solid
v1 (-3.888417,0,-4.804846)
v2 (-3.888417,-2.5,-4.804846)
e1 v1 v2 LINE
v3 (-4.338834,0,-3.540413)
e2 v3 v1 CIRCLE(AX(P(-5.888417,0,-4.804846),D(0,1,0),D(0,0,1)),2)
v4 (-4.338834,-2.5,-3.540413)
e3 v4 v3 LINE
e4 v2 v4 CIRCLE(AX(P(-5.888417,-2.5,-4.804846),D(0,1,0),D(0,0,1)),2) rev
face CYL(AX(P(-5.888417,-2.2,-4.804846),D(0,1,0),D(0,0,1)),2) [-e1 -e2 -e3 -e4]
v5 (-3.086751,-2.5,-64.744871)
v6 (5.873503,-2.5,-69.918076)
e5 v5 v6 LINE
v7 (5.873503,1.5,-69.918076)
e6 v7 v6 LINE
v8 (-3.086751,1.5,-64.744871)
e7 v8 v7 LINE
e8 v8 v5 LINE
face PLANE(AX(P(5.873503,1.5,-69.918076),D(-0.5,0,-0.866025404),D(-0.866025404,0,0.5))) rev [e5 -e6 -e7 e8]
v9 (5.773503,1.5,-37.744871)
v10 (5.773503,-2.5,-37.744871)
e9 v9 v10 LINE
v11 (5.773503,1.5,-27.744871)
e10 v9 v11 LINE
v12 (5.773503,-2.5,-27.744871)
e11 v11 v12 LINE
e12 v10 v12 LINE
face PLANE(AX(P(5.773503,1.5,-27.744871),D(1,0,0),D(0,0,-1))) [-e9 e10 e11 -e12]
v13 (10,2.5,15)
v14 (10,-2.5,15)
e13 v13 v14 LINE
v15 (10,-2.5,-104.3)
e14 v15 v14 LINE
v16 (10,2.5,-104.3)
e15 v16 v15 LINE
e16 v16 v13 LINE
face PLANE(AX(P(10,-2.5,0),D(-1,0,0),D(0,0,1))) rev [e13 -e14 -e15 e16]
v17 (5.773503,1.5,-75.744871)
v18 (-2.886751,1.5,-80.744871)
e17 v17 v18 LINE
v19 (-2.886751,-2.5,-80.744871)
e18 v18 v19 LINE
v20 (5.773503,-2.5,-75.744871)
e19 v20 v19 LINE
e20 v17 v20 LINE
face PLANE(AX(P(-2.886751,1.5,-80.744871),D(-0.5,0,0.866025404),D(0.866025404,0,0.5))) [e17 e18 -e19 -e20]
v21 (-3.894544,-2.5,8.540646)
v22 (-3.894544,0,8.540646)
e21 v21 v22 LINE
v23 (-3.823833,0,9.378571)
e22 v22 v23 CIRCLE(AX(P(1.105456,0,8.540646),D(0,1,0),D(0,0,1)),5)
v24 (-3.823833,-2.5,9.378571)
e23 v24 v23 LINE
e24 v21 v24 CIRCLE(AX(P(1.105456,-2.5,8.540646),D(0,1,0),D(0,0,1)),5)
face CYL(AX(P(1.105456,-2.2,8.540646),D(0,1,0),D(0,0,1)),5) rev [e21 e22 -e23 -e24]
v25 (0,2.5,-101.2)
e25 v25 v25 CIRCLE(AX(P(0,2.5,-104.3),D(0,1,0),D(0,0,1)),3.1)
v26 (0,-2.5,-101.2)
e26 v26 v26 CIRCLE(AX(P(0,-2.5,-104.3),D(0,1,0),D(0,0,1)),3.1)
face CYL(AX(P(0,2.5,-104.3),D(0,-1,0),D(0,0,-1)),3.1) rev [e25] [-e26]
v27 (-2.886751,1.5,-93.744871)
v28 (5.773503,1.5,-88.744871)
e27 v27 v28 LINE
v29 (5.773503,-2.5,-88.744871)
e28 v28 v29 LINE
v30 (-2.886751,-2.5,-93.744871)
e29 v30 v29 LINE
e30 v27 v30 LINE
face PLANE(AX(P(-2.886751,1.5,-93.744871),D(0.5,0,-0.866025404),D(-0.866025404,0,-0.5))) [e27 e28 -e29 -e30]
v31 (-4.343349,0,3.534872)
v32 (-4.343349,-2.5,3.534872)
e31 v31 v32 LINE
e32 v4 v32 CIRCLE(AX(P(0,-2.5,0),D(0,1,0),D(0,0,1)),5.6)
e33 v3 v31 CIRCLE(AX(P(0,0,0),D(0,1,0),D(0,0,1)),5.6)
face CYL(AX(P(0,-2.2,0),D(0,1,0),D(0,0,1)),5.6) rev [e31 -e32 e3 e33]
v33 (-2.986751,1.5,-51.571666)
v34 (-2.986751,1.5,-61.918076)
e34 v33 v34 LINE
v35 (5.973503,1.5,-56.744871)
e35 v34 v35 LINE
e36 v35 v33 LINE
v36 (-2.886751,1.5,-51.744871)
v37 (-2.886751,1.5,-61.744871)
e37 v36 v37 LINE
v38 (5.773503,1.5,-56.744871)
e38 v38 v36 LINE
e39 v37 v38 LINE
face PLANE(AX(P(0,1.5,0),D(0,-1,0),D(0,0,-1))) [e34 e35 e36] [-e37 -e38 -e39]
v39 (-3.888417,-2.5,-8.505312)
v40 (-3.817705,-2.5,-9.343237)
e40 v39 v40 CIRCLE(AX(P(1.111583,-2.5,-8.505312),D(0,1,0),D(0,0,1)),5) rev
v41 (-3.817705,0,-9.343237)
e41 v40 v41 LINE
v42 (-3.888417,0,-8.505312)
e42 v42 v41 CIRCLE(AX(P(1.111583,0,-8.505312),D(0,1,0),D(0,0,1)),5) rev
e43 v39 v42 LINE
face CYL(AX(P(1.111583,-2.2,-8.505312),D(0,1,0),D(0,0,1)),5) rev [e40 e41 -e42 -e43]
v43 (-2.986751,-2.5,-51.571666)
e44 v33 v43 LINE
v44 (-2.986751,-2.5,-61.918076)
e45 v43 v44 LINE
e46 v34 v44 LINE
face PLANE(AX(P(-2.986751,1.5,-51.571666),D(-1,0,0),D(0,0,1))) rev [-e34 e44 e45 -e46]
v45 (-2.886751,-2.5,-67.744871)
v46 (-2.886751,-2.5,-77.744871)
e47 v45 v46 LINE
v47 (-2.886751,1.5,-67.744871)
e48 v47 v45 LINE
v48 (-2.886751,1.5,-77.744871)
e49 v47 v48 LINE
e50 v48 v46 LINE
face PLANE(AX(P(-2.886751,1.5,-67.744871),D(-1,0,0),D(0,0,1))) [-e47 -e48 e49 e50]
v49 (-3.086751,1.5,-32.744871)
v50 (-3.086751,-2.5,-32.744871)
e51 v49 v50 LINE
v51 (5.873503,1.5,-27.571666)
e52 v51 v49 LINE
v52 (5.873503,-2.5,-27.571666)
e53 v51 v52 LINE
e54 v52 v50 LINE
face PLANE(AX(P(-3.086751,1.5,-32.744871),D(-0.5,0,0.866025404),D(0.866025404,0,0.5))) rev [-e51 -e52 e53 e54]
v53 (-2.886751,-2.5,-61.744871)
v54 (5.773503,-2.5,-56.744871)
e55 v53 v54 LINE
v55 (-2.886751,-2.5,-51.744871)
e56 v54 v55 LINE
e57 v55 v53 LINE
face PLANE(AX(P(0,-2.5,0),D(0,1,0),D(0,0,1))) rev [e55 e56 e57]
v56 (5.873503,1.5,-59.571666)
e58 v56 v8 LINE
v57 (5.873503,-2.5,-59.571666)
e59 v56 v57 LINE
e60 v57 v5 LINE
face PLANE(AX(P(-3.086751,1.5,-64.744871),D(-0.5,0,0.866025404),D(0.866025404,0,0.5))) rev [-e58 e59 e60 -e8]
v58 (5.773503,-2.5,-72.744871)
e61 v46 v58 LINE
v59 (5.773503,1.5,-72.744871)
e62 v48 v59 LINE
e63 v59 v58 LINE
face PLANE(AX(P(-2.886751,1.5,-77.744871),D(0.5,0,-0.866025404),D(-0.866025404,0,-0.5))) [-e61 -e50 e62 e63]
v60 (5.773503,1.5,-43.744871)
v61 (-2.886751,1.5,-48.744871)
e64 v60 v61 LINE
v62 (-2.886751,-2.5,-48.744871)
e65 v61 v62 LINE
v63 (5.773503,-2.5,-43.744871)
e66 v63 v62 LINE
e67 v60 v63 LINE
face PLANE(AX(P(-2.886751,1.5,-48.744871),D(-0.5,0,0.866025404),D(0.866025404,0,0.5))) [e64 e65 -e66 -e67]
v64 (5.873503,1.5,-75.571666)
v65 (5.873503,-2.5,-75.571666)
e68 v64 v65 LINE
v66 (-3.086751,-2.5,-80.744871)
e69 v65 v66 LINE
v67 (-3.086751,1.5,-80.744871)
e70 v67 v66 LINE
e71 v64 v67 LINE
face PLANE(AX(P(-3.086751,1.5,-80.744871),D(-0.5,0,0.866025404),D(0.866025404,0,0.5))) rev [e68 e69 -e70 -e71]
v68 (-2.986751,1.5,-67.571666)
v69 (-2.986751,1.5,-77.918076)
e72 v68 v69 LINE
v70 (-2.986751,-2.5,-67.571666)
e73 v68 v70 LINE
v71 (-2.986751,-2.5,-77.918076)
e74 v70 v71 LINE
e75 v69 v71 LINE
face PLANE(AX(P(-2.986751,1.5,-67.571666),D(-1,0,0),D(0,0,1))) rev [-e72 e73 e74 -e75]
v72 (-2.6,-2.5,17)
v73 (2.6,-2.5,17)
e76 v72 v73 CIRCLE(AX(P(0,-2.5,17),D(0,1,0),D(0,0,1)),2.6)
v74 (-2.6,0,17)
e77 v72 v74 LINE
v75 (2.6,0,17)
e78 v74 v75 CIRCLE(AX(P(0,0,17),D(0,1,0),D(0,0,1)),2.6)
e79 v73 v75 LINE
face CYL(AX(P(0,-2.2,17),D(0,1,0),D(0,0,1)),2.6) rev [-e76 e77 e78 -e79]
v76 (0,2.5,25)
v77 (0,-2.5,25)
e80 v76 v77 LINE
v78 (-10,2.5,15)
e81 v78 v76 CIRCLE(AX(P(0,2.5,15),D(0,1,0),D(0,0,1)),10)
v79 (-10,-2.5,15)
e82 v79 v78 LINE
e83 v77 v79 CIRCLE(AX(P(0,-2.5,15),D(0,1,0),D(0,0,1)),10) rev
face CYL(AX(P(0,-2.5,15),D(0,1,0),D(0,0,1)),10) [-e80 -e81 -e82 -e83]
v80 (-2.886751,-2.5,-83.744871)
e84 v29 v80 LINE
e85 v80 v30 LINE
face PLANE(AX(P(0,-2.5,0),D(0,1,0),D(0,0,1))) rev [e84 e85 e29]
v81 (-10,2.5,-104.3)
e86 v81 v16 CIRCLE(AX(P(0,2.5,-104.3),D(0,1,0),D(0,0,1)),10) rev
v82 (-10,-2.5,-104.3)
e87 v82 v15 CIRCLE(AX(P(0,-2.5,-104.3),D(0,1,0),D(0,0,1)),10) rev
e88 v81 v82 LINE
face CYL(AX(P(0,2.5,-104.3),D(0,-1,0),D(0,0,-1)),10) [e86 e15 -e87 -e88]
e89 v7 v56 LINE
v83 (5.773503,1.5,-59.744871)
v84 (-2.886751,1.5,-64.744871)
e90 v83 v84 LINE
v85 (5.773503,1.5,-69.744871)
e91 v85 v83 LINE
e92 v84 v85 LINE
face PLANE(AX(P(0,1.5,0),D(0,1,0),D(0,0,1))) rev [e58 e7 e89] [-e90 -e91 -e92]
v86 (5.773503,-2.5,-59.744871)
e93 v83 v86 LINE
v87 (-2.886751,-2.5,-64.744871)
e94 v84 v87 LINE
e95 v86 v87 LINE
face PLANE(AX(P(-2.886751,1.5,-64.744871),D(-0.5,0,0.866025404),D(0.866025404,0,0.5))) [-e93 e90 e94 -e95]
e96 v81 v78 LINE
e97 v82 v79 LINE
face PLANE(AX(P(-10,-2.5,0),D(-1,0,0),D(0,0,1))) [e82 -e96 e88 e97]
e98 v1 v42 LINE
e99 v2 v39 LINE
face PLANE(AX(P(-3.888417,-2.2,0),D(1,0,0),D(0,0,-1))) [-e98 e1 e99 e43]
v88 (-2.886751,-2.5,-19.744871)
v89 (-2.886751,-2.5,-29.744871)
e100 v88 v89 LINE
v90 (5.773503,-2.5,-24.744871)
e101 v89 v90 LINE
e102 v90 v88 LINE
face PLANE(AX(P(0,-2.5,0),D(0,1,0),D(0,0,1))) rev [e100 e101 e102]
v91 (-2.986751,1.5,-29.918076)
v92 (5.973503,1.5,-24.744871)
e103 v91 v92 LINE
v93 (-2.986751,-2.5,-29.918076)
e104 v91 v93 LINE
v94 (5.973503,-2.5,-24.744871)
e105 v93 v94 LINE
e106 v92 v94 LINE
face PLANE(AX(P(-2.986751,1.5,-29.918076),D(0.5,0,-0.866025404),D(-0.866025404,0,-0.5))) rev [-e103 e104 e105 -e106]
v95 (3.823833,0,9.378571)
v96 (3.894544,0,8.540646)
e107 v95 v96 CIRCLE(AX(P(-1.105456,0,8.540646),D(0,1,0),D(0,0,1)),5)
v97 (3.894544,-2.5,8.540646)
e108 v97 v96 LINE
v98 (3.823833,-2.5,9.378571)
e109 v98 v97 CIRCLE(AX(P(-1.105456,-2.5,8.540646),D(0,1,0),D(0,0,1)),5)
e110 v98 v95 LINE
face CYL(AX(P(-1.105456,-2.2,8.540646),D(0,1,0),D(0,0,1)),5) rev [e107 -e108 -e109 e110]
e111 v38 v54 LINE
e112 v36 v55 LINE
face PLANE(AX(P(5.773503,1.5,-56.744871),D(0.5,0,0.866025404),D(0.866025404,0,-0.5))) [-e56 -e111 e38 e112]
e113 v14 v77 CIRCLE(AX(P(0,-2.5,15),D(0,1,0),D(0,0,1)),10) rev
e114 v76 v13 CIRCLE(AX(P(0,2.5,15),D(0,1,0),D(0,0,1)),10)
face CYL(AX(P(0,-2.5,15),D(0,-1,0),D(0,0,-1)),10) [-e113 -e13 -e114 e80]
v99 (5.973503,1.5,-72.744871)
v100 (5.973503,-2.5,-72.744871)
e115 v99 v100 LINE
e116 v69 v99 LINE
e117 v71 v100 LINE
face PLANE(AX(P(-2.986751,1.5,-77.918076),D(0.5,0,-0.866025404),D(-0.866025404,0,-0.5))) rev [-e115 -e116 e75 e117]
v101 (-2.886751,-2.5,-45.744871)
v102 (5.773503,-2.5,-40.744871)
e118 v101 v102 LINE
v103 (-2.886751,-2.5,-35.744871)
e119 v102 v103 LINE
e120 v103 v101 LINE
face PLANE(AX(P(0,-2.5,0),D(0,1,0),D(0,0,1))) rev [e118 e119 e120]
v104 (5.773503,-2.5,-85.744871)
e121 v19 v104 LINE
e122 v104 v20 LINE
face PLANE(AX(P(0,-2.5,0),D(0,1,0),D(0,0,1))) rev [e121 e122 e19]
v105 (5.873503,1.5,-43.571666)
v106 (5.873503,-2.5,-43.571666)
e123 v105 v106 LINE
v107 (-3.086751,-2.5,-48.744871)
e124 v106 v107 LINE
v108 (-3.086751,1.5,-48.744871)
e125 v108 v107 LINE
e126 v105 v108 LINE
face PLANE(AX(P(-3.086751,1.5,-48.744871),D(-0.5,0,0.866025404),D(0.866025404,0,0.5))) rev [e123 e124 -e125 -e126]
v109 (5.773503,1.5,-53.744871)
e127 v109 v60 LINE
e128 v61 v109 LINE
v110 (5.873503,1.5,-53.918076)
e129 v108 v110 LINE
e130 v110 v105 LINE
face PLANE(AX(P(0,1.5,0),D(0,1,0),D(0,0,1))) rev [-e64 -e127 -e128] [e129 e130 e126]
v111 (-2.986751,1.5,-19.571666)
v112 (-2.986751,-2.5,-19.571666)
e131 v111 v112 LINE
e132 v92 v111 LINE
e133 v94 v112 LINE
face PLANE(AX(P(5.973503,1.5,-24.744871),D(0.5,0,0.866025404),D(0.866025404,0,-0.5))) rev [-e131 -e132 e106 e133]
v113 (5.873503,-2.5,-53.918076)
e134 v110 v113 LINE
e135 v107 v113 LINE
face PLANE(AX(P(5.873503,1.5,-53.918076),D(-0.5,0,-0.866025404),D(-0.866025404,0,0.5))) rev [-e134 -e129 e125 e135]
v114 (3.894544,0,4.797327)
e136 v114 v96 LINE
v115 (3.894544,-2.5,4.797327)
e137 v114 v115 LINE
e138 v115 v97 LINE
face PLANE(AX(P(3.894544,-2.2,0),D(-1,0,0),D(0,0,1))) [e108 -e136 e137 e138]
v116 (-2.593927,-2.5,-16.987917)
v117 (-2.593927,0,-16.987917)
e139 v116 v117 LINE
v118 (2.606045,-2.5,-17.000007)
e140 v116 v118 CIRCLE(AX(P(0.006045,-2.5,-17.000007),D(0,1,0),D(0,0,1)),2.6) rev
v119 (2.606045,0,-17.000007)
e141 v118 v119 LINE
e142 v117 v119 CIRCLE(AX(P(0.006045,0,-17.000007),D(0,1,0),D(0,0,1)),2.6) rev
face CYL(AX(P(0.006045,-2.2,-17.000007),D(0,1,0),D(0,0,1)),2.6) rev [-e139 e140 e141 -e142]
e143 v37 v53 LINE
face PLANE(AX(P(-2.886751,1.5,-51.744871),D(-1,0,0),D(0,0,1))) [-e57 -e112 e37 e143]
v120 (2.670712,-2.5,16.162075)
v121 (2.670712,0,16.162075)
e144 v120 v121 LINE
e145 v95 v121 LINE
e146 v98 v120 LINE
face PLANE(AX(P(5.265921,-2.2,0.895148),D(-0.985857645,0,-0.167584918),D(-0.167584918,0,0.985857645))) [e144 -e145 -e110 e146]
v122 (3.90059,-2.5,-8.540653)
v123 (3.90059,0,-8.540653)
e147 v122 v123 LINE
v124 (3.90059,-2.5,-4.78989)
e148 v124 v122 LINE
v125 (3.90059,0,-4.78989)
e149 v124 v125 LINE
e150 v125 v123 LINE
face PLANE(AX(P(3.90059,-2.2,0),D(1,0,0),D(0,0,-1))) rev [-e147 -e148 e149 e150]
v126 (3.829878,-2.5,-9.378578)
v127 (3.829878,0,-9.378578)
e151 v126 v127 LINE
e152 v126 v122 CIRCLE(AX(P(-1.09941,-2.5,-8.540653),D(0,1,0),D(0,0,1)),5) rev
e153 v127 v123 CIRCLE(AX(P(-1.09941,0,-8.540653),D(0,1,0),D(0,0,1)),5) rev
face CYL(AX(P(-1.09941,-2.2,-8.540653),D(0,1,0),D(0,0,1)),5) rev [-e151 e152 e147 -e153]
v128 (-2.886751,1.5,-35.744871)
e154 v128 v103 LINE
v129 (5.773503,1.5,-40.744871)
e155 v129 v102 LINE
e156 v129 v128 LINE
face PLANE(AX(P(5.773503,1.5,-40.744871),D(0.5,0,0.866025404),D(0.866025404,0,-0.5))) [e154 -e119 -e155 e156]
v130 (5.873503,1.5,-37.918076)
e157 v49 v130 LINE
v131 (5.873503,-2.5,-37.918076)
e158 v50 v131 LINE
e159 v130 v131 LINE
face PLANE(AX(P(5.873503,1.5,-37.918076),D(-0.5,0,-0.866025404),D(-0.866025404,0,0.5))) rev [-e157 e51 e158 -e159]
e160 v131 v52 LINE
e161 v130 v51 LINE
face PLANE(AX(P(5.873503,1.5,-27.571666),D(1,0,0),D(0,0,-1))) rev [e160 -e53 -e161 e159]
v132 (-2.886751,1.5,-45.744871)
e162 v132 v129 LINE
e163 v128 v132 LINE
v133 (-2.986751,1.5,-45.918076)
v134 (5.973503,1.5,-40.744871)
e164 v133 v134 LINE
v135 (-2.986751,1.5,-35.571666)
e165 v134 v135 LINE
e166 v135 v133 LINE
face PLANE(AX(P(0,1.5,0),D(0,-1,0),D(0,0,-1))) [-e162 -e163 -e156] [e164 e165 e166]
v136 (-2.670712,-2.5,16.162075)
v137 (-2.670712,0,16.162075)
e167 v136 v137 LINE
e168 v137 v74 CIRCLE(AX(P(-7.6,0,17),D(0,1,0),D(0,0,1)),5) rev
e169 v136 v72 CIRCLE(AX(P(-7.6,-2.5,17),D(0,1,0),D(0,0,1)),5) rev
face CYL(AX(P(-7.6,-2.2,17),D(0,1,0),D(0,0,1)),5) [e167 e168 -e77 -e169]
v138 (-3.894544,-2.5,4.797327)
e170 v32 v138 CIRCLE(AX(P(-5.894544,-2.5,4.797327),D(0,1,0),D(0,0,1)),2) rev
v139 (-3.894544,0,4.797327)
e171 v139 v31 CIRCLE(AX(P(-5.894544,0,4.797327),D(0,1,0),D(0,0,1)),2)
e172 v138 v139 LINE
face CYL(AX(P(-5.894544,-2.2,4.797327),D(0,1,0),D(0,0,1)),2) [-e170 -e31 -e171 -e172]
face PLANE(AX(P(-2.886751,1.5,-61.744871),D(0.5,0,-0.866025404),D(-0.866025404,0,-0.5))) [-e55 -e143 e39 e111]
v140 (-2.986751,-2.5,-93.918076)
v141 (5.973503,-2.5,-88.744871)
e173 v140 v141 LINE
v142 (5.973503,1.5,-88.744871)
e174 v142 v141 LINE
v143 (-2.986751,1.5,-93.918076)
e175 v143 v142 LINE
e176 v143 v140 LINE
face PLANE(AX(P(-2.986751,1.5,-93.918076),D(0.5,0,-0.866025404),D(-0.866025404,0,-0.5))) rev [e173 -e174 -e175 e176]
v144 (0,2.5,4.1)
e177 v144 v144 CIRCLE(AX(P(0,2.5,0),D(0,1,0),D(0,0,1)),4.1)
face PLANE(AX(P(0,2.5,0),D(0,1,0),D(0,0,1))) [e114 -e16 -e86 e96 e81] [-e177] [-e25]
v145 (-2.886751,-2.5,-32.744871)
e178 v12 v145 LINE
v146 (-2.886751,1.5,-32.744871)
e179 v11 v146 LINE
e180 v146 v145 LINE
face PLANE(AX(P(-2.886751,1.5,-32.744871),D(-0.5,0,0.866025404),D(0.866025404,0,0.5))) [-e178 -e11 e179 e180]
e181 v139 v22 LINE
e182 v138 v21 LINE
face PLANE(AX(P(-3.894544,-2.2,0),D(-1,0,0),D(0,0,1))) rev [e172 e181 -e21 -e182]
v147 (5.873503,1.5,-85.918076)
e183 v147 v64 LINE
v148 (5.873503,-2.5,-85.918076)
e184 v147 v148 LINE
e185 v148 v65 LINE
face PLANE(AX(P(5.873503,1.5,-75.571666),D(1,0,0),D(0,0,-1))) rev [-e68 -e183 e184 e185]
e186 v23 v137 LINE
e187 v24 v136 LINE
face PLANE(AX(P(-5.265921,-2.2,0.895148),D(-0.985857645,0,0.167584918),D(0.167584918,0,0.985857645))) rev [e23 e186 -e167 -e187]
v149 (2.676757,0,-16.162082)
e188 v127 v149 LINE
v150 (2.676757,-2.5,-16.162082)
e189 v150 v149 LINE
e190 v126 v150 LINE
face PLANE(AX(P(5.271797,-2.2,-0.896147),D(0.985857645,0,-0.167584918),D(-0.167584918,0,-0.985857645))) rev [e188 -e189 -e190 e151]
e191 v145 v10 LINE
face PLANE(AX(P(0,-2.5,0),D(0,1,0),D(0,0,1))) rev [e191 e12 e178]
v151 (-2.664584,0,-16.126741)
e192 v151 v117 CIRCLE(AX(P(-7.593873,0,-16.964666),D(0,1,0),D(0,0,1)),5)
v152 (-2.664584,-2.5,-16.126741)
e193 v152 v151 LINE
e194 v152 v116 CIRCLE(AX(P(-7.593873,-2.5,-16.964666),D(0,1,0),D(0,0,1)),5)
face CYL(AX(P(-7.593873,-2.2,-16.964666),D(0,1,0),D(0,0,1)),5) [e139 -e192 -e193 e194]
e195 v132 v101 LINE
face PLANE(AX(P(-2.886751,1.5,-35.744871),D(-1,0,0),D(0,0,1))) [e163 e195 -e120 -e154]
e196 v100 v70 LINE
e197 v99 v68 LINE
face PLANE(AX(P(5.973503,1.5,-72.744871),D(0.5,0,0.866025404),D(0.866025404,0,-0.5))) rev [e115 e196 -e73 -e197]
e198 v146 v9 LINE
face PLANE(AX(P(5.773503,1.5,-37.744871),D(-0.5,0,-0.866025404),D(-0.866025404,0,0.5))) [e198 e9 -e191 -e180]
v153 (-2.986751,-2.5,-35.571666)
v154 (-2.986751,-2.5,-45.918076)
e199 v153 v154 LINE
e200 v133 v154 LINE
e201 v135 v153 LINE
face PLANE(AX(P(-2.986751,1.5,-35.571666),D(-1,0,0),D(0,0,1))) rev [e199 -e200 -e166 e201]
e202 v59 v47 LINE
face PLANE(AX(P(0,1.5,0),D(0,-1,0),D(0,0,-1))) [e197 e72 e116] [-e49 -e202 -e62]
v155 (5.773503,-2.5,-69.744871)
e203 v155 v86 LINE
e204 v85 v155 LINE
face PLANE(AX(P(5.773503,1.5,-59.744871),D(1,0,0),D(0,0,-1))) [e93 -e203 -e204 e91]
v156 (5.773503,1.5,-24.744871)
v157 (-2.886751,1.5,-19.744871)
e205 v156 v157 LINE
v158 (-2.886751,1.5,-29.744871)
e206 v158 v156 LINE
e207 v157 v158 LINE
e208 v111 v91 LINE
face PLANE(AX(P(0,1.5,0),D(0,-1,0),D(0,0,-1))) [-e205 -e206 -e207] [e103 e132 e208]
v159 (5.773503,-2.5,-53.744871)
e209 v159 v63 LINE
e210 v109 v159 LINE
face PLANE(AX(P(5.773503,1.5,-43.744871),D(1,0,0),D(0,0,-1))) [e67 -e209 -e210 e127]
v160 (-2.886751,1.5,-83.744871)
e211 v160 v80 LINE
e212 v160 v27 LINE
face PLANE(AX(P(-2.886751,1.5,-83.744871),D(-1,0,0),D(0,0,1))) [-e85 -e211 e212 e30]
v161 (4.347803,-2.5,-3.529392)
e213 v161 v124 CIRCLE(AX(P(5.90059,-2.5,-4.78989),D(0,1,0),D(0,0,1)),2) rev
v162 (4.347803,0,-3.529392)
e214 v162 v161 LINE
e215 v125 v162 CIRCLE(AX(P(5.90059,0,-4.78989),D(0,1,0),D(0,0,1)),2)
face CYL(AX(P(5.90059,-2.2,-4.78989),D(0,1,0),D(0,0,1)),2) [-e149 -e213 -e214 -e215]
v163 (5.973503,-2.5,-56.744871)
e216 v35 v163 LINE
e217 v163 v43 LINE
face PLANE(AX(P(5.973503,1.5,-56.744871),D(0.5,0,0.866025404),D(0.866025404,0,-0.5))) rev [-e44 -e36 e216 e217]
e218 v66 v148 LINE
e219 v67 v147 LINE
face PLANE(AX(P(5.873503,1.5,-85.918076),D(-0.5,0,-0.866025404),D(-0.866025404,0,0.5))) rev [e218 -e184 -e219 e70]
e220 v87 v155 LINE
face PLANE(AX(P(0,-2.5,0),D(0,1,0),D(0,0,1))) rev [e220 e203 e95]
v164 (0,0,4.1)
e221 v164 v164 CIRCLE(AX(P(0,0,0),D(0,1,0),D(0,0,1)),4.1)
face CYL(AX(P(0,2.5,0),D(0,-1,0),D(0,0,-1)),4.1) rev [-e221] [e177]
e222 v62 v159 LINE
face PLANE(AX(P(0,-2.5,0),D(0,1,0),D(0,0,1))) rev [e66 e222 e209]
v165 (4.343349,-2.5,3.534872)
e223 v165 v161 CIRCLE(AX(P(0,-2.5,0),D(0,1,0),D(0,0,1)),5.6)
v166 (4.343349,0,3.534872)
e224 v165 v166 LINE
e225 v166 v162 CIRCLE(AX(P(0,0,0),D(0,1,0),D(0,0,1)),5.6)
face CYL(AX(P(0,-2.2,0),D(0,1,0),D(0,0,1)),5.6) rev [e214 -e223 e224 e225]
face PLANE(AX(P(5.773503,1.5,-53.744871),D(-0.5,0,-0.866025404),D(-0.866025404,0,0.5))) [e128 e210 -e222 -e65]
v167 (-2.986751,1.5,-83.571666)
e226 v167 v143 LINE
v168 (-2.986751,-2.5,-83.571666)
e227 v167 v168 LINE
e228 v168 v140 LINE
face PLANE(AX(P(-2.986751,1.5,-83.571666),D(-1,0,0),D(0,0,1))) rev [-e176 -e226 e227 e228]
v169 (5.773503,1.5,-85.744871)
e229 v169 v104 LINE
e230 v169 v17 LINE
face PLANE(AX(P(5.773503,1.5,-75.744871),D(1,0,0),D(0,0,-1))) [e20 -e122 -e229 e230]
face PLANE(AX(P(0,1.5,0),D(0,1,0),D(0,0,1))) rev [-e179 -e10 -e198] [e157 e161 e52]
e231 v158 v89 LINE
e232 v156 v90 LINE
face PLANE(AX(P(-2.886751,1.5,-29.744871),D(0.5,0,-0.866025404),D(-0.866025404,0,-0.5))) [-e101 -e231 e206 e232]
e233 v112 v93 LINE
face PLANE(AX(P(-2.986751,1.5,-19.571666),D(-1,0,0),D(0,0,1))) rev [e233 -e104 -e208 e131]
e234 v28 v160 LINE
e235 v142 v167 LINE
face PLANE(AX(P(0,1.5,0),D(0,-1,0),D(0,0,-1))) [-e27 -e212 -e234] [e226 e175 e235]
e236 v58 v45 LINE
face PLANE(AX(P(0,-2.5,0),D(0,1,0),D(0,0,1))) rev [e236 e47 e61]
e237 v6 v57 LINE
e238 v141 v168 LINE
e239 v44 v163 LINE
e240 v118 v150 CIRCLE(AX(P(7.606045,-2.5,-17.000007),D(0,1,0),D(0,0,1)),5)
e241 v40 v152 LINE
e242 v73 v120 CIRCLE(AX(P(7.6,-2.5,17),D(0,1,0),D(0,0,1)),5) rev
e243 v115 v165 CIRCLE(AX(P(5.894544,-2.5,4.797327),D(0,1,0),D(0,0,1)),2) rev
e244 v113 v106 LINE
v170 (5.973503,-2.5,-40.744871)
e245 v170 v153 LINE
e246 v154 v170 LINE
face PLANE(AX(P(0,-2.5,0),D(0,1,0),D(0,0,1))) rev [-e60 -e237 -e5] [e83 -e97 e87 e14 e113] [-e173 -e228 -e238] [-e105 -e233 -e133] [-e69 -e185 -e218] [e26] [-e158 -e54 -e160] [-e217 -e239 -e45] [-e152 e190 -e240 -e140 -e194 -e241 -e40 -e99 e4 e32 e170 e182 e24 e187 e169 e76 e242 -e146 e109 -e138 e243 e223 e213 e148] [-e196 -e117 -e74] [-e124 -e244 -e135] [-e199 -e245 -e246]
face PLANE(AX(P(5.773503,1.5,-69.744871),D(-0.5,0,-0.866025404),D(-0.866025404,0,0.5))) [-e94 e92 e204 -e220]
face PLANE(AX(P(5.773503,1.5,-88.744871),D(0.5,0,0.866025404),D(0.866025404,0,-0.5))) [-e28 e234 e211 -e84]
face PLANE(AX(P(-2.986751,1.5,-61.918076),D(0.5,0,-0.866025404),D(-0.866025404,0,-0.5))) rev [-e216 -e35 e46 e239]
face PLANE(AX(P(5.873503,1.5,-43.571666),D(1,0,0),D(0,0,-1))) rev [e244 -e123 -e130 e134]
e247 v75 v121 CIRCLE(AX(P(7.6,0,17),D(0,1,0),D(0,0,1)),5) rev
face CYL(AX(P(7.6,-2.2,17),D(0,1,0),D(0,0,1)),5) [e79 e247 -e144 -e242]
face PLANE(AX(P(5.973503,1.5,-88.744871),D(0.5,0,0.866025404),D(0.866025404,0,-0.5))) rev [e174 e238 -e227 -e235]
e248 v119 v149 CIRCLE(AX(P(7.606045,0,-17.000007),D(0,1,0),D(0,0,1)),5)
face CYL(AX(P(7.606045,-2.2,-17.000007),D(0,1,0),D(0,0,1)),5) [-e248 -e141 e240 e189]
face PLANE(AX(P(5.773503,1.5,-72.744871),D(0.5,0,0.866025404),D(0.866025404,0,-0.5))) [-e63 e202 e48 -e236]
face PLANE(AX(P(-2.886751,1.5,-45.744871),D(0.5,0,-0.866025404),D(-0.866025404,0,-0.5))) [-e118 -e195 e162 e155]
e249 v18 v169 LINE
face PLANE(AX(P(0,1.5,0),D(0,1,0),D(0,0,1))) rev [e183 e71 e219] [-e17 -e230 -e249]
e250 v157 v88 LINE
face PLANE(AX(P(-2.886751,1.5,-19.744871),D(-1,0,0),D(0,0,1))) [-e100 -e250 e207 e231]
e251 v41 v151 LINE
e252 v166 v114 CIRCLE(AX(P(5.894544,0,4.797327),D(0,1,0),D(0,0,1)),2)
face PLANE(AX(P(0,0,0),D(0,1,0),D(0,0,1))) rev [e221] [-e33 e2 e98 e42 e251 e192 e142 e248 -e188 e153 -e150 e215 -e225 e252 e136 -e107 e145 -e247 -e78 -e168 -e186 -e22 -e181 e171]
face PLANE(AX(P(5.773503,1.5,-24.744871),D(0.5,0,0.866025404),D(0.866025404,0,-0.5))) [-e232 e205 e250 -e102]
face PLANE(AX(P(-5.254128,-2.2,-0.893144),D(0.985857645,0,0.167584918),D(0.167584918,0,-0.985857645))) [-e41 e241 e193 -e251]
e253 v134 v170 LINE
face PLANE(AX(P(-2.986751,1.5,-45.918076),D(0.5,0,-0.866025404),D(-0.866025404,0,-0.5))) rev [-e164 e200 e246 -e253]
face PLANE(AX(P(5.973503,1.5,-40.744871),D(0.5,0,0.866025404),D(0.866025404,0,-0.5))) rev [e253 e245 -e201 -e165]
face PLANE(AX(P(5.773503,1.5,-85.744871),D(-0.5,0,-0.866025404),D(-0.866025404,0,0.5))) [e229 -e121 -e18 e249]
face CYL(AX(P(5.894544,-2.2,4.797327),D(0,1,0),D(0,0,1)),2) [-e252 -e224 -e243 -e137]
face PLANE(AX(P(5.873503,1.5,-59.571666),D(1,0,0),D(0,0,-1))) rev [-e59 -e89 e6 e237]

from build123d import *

# Parameters (mm, degrees)
SKETCH1_W           = 15
SKETCH1_H           = 45
BOSS_EXTRUDE1_DEPTH = 2.2
SKETCH1_3_W         = 20
SKETCH1_3_H         = 50
SKETCH1_3_W_2       = 15
SKETCH1_3_H_2       = 45
BOSS_EXTRUDE2_DEPTH = 2.5
SKETCH1_4_W         = 20
SKETCH1_4_H         = 50
SKETCH1_4_R         = 4.1
BOSS_EXTRUDE3_DEPTH = 2.5
FILLET1_R           = 2
SKETCH1_5_R         = 3.1
BOSS_EXTRUDE4_DEPTH = 2.5
FILLET2_R           = 10
SKETCH2_R           = 3.1
CUT_EXTRUDE1_DEPTH  = 4


with BuildPart() as part:
    # Sketch1 → Boss-Extrude1 (new body)
    with BuildSketch(Plane(origin=(0, 0, 0), x_dir=(1, 0, 0), z_dir=(0, 1, 0))):
        Rectangle(SKETCH1_W, SKETCH1_H)
        with BuildLine():
            ThreePointArc((-3.894544437, -4.023993492), (-5.599998379, 0.004260474), (-3.88841703, 4.029914763))
            Line((-3.88841703, 4.029914763), (-3.88841703, 8.505312122))
            ThreePointArc((-3.88841703, 8.505312122), (-3.870707724, 8.925763598), (-3.817705253, 9.343236712))
            Line((-3.817705253, 9.343236712), (-2.664584371, 16.126741161))
            ThreePointArc((-2.664584371, 16.126741161), (-2.610617779, 16.555799687), (-2.593926654, 16.987916591))
            ThreePointArc((-2.593926654, 16.987916591), (0, 19.6), (2.606045235, 17.000007028))
            ThreePointArc((2.606045235, 17.000007028), (2.623754541, 16.579555552), (2.676757012, 16.162082438))
            Line((2.676757012, 16.162082438), (3.829877895, 9.378577989))
            ThreePointArc((3.829877895, 9.378577989), (3.882880366, 8.961104875), (3.900589672, 8.540653399))
            Line((3.900589672, 8.540653399), (3.900589672, 4.018133922))
            ThreePointArc((3.900589672, 4.018133922), (5.157678846, 2.181364004), (5.6, 0))
            ThreePointArc((5.6, 0), (5.156037667, -2.185240393), (3.894544437, -4.023993492))
            Line((3.894544437, -4.023993492), (3.894544437, -8.540646372))
            ThreePointArc((3.894544437, -8.540646372), (3.876835131, -8.961097847), (3.82383266, -9.378570962))
            Line((3.82383266, -9.378570962), (2.670711777, -16.16207541))
            ThreePointArc((2.670711777, -16.16207541), (2.617709306, -16.579548524), (2.6, -17))
            ThreePointArc((2.6, -17), (0, -19.6), (-2.6, -17))
            ThreePointArc((-2.6, -17), (-2.617709306, -16.579548524), (-2.670711777, -16.16207541))
            Line((-2.670711777, -16.16207541), (-3.82383266, -9.378570962))
            ThreePointArc((-3.82383266, -9.378570962), (-3.876835131, -8.961097847), (-3.894544437, -8.540646372))
            Line((-3.894544437, -8.540646372), (-3.894544437, -4.023993492))
        make_face(mode=Mode.SUBTRACT)
    extrude(amount=-BOSS_EXTRUDE1_DEPTH)

    # Sketch1<3> → Boss-Extrude2 (add)
    # profile 1 of 2: a face of its own
    with BuildSketch(Plane(origin=(0, 0, 0), x_dir=(1, 0, 0), z_dir=(0, 1, 0))):
        Rectangle(SKETCH1_3_W, SKETCH1_3_H)
        Rectangle(SKETCH1_3_W_2, SKETCH1_3_H_2, mode=Mode.SUBTRACT)
    # profile 2 of 2: a face of its own
    with BuildSketch(Plane(origin=(0, 0, 0), x_dir=(1, 0, 0), z_dir=(0, 1, 0))):
        Rectangle(SKETCH1_3_W_2, SKETCH1_3_H_2)
        with BuildLine():
            ThreePointArc((-3.894544437, -4.023993492), (-5.599998379, 0.004260474), (-3.88841703, 4.029914763))
            Line((-3.88841703, 4.029914763), (-3.88841703, 8.505312122))
            ThreePointArc((-3.88841703, 8.505312122), (-3.870707724, 8.925763598), (-3.817705253, 9.343236712))
            Line((-3.817705253, 9.343236712), (-2.664584371, 16.126741161))
            ThreePointArc((-2.664584371, 16.126741161), (-2.610617779, 16.555799687), (-2.593926654, 16.987916591))
            ThreePointArc((-2.593926654, 16.987916591), (0, 19.6), (2.606045235, 17.000007028))
            ThreePointArc((2.606045235, 17.000007028), (2.623754541, 16.579555552), (2.676757012, 16.162082438))
            Line((2.676757012, 16.162082438), (3.829877895, 9.378577989))
            ThreePointArc((3.829877895, 9.378577989), (3.882880366, 8.961104875), (3.900589672, 8.540653399))
            Line((3.900589672, 8.540653399), (3.900589672, 4.018133922))
            ThreePointArc((3.900589672, 4.018133922), (5.157678846, 2.181364004), (5.6, 0))
            ThreePointArc((5.6, 0), (5.156037667, -2.185240393), (3.894544437, -4.023993492))
            Line((3.894544437, -4.023993492), (3.894544437, -8.540646372))
            ThreePointArc((3.894544437, -8.540646372), (3.876835131, -8.961097847), (3.82383266, -9.378570962))
            Line((3.82383266, -9.378570962), (2.670711777, -16.16207541))
            ThreePointArc((2.670711777, -16.16207541), (2.617709306, -16.579548524), (2.6, -17))
            ThreePointArc((2.6, -17), (0, -19.6), (-2.6, -17))
            ThreePointArc((-2.6, -17), (-2.617709306, -16.579548524), (-2.670711777, -16.16207541))
            Line((-2.670711777, -16.16207541), (-3.82383266, -9.378570962))
            ThreePointArc((-3.82383266, -9.378570962), (-3.876835131, -8.961097847), (-3.894544437, -8.540646372))
            Line((-3.894544437, -8.540646372), (-3.894544437, -4.023993492))
        make_face(mode=Mode.SUBTRACT)
    extrude(amount=-BOSS_EXTRUDE2_DEPTH)

    # Sketch1<4> → Boss-Extrude3 (add)
    with BuildSketch(Plane(origin=(0, 0, 0), x_dir=(1, 0, 0), z_dir=(0, 1, 0))):
        Rectangle(SKETCH1_4_W, SKETCH1_4_H)
        with Locations(Location((0, 0, 0), (0, 0, 270))):
            Circle(SKETCH1_4_R, mode=Mode.SUBTRACT)
    extrude(amount=BOSS_EXTRUDE3_DEPTH)

    # Fillet1
    fillet1_edges = [part.edges().sort_by_distance(p)[0] for p in [
        (-3.88841703, -1.25, -4.029914763),
        (-3.894544437, -1.25, 4.023993492),
        (3.894544437, -1.25, 4.023993492),
        (3.900589672, -1.25, -4.018133922),
    ]]
    fillet(fillet1_edges, radius=FILLET1_R)

    # Sketch1<5> → Boss-Extrude4 (add, symmetric)
    with BuildSketch(Plane(origin=(0, 0, 0), x_dir=(1, 0, 0), z_dir=(0, 1, 0))):
        with BuildLine():
            ThreePointArc((-10, 104.3), (0, 114.3), (10, 104.3))
            Line((10, 104.3), (10, 25))
            Line((10, 25), (-10, 25))
            Line((-10, 25), (-10, 104.3))
        make_face()
        with Locations(Location((0, 104.3, 0), (0, 0, 270))):
            Circle(SKETCH1_5_R, mode=Mode.SUBTRACT)
    extrude(amount=BOSS_EXTRUDE4_DEPTH, both=True)

    # Fillet2
    fillet2_edges = [part.edges().sort_by_distance(p)[0] for p in [
        (10, 0, 25),
        (-10, 0, 25),
    ]]
    fillet(fillet2_edges, radius=FILLET2_R - 0.0001)  # a hair under: the kernel refuses the full size

    # Sketch2 → Cut-Extrude1 (cut)
    # profile 1 of 10: a face of its own
    with BuildSketch(Plane.XZ.offset(2.5)):
        with Locations(Location((0, -104.3, 0), (0, 0, 90))):
            Circle(SKETCH2_R)
    # profile 2 of 10: a face of its own
    with BuildSketch(Plane.XZ.offset(2.5)):
        Polygon((-3.086751346, -80.744870683), (5.873502692, -75.571665602), (5.873502692, -85.918075763), align=None)
        Polygon((-2.886751346, -80.744870683), (5.773502692, -75.744870683), (5.773502692, -85.744870683), align=None, mode=Mode.SUBTRACT)
    # profile 3 of 10: a face of its own
    with BuildSketch(Plane.XZ.offset(2.5)):
        Polygon((5.973502692, -88.744870683), (-2.986751346, -83.571665602), (-2.986751346, -93.918075763), align=None)
        Polygon((-2.886751346, -83.744870683), (-2.886751346, -93.744870683), (5.773502692, -88.744870683), align=None, mode=Mode.SUBTRACT)
    # profile 4 of 10: a face of its own
    with BuildSketch(Plane.XZ.offset(2.5)):
        Polygon((5.973502692, -72.744870683), (-2.986751346, -67.571665602), (-2.986751346, -77.918075763), align=None)
        Polygon((5.773502692, -72.744870683), (-2.886751346, -67.744870683), (-2.886751346, -77.744870683), align=None, mode=Mode.SUBTRACT)
    # profile 5 of 10: a face of its own
    with BuildSketch(Plane.XZ.offset(2.5)):
        Polygon((5.973502692, -56.744870683), (-2.986751346, -51.571665602), (-2.986751346, -61.918075763), align=None)
        Polygon((5.773502692, -56.744870683), (-2.886751346, -51.744870683), (-2.886751346, -61.744870683), align=None, mode=Mode.SUBTRACT)
    # profile 6 of 10: a face of its own
    with BuildSketch(Plane.XZ.offset(2.5)):
        Polygon((5.973502692, -40.744870683), (-2.986751346, -35.571665602), (-2.986751346, -45.918075763), align=None)
        Polygon((5.773502692, -40.744870683), (-2.886751346, -35.744870683), (-2.886751346, -45.744870683), align=None, mode=Mode.SUBTRACT)
    # profile 7 of 10: a face of its own
    with BuildSketch(Plane.XZ.offset(2.5)):
        Polygon((5.973502692, -24.744870683), (-2.986751346, -19.571665602), (-2.986751346, -29.918075763), align=None)
        Polygon((5.773502692, -24.744870683), (-2.886751346, -19.744870683), (-2.886751346, -29.744870683), align=None, mode=Mode.SUBTRACT)
    # profile 8 of 10: a face of its own
    with BuildSketch(Plane.XZ.offset(2.5)):
        Polygon((-3.086751346, -64.744870683), (5.873502692, -59.571665602), (5.873502692, -69.918075763), align=None)
        Polygon((5.773502692, -69.744870683), (-2.886751346, -64.744870683), (5.773502692, -59.744870683), align=None, mode=Mode.SUBTRACT)
    # profile 9 of 10: a face of its own
    with BuildSketch(Plane.XZ.offset(2.5)):
        Polygon((-3.086751346, -48.744870683), (5.873502692, -43.571665602), (5.873502692, -53.918075763), align=None)
        Polygon((5.773502692, -53.744870683), (-2.886751346, -48.744870683), (5.773502692, -43.744870683), align=None, mode=Mode.SUBTRACT)
    # profile 10 of 10: a face of its own
    with BuildSketch(Plane.XZ.offset(2.5)):
        Polygon((-3.086751346, -32.744870683), (5.873502692, -27.571665602), (5.873502692, -37.918075763), align=None)
        Polygon((5.773502692, -37.744870683), (-2.886751346, -32.744870683), (5.773502692, -27.744870683), align=None, mode=Mode.SUBTRACT)
    extrude(amount=-CUT_EXTRUDE1_DEPTH, mode=Mode.SUBTRACT)


solid = part.part
